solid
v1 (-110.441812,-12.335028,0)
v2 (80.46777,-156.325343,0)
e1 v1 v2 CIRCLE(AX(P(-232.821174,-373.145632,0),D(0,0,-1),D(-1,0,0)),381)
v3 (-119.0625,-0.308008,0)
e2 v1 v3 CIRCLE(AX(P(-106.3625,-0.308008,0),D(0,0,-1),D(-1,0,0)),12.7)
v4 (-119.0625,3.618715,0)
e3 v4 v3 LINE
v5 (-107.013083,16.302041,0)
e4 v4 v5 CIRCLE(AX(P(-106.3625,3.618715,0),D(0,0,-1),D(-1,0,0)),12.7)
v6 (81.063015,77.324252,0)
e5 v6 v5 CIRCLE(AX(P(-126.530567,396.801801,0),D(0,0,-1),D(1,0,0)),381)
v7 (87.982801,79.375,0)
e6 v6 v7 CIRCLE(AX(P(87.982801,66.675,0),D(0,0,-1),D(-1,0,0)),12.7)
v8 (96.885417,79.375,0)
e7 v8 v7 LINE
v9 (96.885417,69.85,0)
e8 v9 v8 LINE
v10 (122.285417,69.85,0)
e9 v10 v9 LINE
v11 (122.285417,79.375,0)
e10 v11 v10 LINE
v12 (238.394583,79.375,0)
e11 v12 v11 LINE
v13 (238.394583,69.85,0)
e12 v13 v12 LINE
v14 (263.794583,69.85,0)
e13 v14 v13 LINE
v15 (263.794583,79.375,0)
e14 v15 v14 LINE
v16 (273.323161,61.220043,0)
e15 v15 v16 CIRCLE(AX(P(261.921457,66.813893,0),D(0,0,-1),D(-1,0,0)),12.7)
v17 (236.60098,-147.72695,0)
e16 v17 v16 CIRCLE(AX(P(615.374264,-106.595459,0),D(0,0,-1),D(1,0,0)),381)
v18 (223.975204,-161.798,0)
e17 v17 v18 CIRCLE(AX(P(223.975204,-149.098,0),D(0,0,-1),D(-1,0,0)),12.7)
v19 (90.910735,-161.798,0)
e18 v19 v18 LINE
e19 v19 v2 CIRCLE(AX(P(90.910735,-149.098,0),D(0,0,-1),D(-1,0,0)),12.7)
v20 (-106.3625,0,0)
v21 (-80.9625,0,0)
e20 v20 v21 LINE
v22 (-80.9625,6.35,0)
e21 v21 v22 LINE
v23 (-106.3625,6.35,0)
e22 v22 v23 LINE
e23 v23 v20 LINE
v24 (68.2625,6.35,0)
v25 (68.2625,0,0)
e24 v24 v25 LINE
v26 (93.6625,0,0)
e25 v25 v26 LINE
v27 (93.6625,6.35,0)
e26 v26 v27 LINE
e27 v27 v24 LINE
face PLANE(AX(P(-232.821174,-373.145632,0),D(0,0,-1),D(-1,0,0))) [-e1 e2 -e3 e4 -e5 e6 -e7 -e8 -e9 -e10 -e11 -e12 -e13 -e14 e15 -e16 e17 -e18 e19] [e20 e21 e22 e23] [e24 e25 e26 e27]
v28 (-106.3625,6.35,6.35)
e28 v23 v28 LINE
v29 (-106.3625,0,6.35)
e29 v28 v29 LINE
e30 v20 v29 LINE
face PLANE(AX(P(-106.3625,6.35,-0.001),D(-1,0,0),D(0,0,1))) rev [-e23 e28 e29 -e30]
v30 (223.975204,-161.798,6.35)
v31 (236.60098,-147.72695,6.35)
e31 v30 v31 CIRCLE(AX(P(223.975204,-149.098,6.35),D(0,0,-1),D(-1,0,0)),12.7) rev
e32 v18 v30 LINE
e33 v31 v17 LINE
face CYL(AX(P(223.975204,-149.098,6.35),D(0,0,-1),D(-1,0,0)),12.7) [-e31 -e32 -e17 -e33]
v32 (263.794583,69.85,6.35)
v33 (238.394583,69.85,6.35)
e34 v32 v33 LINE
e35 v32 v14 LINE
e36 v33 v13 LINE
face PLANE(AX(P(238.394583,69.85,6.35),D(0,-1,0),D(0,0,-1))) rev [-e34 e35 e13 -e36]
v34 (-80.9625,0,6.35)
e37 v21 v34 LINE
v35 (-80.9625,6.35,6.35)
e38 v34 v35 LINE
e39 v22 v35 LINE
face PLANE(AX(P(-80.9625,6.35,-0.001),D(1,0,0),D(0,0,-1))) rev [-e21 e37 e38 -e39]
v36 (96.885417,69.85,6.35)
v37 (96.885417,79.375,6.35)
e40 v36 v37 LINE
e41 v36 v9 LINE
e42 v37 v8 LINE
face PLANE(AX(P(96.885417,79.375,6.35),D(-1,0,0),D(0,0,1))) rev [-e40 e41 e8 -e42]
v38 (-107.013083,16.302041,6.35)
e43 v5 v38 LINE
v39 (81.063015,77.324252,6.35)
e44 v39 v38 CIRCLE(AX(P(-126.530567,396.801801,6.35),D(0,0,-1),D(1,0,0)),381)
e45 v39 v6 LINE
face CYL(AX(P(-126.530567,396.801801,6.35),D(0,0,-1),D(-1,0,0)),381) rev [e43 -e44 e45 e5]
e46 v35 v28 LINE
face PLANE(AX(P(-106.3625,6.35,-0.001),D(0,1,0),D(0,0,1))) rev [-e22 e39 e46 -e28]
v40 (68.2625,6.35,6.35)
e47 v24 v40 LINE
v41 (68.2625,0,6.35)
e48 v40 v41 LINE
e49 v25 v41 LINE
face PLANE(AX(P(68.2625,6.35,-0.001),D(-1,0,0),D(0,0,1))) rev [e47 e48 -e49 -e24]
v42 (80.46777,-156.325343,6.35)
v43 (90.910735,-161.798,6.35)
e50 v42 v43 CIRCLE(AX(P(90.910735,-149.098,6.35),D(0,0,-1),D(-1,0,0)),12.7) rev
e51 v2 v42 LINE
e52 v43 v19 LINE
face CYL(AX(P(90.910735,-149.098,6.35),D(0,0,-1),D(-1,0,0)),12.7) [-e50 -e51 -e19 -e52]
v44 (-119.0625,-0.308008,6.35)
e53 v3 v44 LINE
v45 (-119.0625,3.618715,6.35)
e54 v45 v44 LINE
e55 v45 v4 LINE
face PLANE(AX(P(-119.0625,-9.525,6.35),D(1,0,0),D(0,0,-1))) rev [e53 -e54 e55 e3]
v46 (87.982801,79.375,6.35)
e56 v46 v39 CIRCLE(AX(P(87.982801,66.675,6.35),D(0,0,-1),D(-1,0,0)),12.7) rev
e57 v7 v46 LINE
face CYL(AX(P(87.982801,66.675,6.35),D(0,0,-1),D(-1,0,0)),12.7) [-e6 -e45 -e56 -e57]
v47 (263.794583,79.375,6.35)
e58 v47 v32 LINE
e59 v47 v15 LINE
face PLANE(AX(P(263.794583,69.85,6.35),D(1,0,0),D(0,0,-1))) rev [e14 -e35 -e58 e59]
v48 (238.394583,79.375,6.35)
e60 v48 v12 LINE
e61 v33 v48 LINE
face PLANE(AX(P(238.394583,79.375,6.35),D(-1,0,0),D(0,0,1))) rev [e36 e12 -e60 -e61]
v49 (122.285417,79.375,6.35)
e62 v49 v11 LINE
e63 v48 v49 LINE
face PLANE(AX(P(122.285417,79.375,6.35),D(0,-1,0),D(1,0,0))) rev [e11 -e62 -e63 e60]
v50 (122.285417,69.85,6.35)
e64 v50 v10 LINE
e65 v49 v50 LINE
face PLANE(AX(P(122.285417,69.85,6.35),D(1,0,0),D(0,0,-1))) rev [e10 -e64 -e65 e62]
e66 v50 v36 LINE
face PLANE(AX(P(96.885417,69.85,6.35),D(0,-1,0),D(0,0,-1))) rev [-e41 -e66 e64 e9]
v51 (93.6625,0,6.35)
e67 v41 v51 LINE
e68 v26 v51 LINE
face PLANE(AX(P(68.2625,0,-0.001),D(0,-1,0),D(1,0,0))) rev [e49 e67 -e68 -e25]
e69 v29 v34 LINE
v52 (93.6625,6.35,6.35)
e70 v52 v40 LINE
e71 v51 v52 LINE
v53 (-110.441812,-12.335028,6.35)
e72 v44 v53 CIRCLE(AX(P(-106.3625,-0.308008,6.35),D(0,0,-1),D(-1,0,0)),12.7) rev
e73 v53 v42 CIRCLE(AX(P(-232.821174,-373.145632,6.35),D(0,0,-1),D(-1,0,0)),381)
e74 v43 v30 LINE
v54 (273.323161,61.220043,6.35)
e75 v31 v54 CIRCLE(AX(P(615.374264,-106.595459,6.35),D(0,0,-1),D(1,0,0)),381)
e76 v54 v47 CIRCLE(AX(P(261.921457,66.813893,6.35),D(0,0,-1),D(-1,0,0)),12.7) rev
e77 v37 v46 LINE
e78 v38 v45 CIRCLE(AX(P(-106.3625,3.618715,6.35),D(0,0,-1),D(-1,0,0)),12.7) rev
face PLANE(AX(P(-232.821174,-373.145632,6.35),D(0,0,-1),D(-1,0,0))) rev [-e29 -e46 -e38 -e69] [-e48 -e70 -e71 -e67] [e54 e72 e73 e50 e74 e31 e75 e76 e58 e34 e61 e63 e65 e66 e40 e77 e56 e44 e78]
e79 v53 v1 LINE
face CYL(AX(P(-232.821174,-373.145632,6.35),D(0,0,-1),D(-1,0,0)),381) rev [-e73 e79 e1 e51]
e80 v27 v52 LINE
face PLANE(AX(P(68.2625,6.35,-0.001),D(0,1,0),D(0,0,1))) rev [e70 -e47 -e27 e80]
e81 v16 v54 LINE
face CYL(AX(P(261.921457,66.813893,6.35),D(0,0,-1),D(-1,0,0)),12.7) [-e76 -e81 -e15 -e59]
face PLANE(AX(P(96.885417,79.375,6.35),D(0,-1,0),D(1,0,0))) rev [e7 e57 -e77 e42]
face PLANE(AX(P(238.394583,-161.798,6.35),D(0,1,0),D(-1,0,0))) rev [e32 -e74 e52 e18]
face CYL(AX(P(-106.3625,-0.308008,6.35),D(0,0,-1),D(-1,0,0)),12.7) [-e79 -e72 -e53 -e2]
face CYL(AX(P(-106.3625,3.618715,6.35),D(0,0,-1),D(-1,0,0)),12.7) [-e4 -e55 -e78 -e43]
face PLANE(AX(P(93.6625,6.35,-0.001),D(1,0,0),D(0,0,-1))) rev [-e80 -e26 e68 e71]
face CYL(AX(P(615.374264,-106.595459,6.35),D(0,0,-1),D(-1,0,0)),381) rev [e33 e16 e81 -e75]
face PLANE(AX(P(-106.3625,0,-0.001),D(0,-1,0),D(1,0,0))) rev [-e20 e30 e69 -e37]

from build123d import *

# Parameters (mm, degrees)
EXTRUDE1_DEPTH     = 6.35
CUT_EXTRUDE1_REACH = 327.914
SKETCH2_W          = 25.4
SKETCH2_H          = 6.35
FILLET1_R          = 12.7


with BuildPart() as part:
    # Sketch1 → Extrude1 (new body)
    with BuildSketch(Plane.XY):
        with BuildLine():
            Line((-119.0625, -9.525), (-119.0625, 15.875))
            ThreePointArc((-119.0625, 15.875), (-12.912203714, 33.137302813), (84.185416539, 79.375))
            Line((84.185416539, 79.375), (96.885416539, 79.375))
            Line((96.885416539, 79.375), (96.885416539, 69.85))
            Line((96.885416539, 69.85), (122.285416539, 69.85))
            Line((122.285416539, 69.85), (122.285416539, 79.375))
            Line((122.285416539, 79.375), (238.394583461, 79.375))
            Line((238.394583461, 79.375), (238.394583461, 69.85))
            Line((238.394583461, 69.85), (263.794583461, 69.85))
            Line((263.794583461, 69.85), (263.794583461, 79.375))
            Line((263.794583461, 79.375), (282.844583461, 79.375))
            ThreePointArc((282.844583461, 79.375), (240.685076339, -37.537420224), (238.394583461, -161.797999999))
            Line((238.394583461, -161.797999999), (84.185416539, -161.797999999))
            ThreePointArc((84.185416539, -161.797999999), (-4.377647242, -68.228339866), (-119.0625, -9.525))
        make_face()
    extrude(amount=EXTRUDE1_DEPTH)

    # Sketch2 → Cut-Extrude1 (cut, up to next)
    with BuildSketch(Plane.XY.offset(6.35), mode=Mode.PRIVATE) as cut_extrude1_sk1:
        with Locations((80.9625, 3.175)):
            Rectangle(SKETCH2_W, SKETCH2_H)
    cut_extrude1_tool1 = extrude(cut_extrude1_sk1.sketch, amount=-CUT_EXTRUDE1_REACH, mode=Mode.PRIVATE) & part.part
    # Sketch2 → Cut-Extrude1 (cut, up to next)
    with BuildSketch(Plane.XY.offset(6.35), mode=Mode.PRIVATE) as cut_extrude1_sk2:
        with Locations((-93.6625, 3.175)):
            Rectangle(SKETCH2_W, SKETCH2_H)
    cut_extrude1_tool2 = extrude(cut_extrude1_sk2.sketch, amount=-CUT_EXTRUDE1_REACH, mode=Mode.PRIVATE) & part.part
    add(cut_extrude1_tool1.solids().sort_by_distance((80.9625, 3.175, 6.35))[0], mode=Mode.SUBTRACT)
    add(cut_extrude1_tool2.solids().sort_by_distance((-93.6625, 3.175, 6.35))[0], mode=Mode.SUBTRACT)

    # Fillet1
    # the kernel refuses this fillet: 12.7 mm, written as the material it takes off along each edge
    with BuildSketch(Plane(origin=(-119.0625, -9.525, -23.042479417), x_dir=(0, 1, 0), z_dir=(0, 0, 1))) as fillet1_piece_1:
        with BuildLine():
            CenterArc((9.216991767, -12.7), FILLET1_R, 90, 71.264145378)
            Line((-2.810028359, -8.620687938), (-3.050568761, -8.539101697))
            ThreePointArc((-3.050568761, -8.539101697), (-1.620862846, -4.239985213), (-0.242413755, 0.075839116))
            Line((-0.242413755, 0.075839116), (0, 0.254))
            Line((0, 0.254), (9.216991767, 0.254))
            Line((9.216991767, 0.254), (9.216991767, 0))
        make_face()
    extrude(amount=52.434958835, mode=Mode.SUBTRACT)
    with BuildSketch(Plane(origin=(-119.0625, 15.875, -30.640711511), x_dir=(0, -1, 0), z_dir=(0, 0, 1))) as fillet1_piece_2:
        with BuildLine():
            CenterArc((12.256284605, 12.7), FILLET1_R, 182.936375733, 87.063624267)
            Line((-0.427040748, 12.049417188), (-0.680707255, 12.036405531))
            ThreePointArc((-0.680707255, 12.036405531), (-0.419694109, 6.017401636), (-0.253951201, -0.004978711))
            Line((-0.253951201, -0.004978711), (0, -0.254))
            Line((0, -0.254), (12.256284605, -0.254))
            Line((12.256284605, -0.254), (12.256284605, 0))
        make_face()
    extrude(amount=67.631423023, mode=Mode.SUBTRACT)
    with BuildSketch(Plane(origin=(84.185416539, 79.375, -9.493460645), x_dir=(-0.8358425258463126, -0.5489692814601342, 0), z_dir=(0, 0, 1))) as fillet1_piece_3:
        with BuildLine():
            CenterArc((3.797894625, 12.699847386), FILLET1_R, 236.703669928, 33.015441722)
            Line((-3.17401525, 2.084647308), (-3.313453447, 1.872343306))
            Line((-3.313453447, 1.872343306), (-0.139438197, -0.212304002))
            Line((-0.139438197, -0.212304002), (0.001245211, -0.253996948))
            ThreePointArc((0.001245211, -0.253996948), (1.867817029, -0.249421573), (3.734388846, -0.253996948))
            Line((3.734388846, -0.253996948), (3.735634057, 0))
        make_face()
    extrude(amount=25.33692129, mode=Mode.SUBTRACT)
    with BuildSketch(Plane(origin=(282.844583461, 79.375, -51.250606191), x_dir=(-0.4644541508381782, -0.8855971667576557, 0), z_dir=(0, 0, 1))) as fillet1_piece_4:
        with BuildLine():
            CenterArc((20.841913184, -12.695403149), FILLET1_R, 91.541626127, 107.65176457)
            Line((8.847851573, -16.870626027), (8.607970341, -16.954130484))
            ThreePointArc((8.607970341, -16.954130484), (4.198984106, -8.553284368), (-0.22494168, -0.117971354))
            Line((-0.22494168, -0.117971354), (0.006833414, 0.253908063))
            ThreePointArc((0.006833414, 0.253908063), (10.250121238, 0.116094484), (20.493409062, 0.253908063))
            Line((20.493409062, 0.253908063), (20.500242476, 0))
        make_face()
    extrude(amount=108.851212382, mode=Mode.SUBTRACT)
    with BuildSketch(Plane(origin=(238.394583461, -161.797999999, -36.048448379), x_dir=(-1, 0, 0), z_dir=(0, 0, 1))) as fillet1_piece_5:
        with BuildLine():
            CenterArc((14.419379352, -12.7), FILLET1_R, 90, 96.197539908)
            Line((1.793603229, -14.071049709), (1.541087707, -14.098470704))
            ThreePointArc((1.541087707, -14.098470704), (0.710330378, -7.0592939), (-0.251319787, -0.036801694))
            Line((-0.251319787, -0.036801694), (0, 0.254))
            Line((0, 0.254), (14.419379352, 0.254))
            Line((14.419379352, 0.254), (14.419379352, 0))
        make_face()
    extrude(amount=78.446896758, mode=Mode.SUBTRACT)
    with BuildSketch(Plane(origin=(84.185416539, -161.797999999, -16.813294938), x_dir=(-0.561921339312421, 0.827190672351505, 0), z_dir=(0, 0, 1))) as fillet1_piece_6:
        with BuildLine():
            CenterArc((6.726221855, -12.699521307), FILLET1_R, 90.497468654, 55.313755774)
            Line((-3.779099684, -5.563120298), (-3.989206115, -5.420392277))
            Line((-3.989206115, -5.420392277), (-0.210106431, 0.14272802))
            Line((-0.210106431, 0.14272802), (0.002205319, 0.253990426))
            ThreePointArc((0.002205319, 0.253990426), (3.307977961, 0.239639207), (6.613750604, 0.253990426))
            Line((6.613750604, 0.253990426), (6.615955923, 0))
        make_face()
    extrude(amount=39.976589876, mode=Mode.SUBTRACT)


solid = part.part
